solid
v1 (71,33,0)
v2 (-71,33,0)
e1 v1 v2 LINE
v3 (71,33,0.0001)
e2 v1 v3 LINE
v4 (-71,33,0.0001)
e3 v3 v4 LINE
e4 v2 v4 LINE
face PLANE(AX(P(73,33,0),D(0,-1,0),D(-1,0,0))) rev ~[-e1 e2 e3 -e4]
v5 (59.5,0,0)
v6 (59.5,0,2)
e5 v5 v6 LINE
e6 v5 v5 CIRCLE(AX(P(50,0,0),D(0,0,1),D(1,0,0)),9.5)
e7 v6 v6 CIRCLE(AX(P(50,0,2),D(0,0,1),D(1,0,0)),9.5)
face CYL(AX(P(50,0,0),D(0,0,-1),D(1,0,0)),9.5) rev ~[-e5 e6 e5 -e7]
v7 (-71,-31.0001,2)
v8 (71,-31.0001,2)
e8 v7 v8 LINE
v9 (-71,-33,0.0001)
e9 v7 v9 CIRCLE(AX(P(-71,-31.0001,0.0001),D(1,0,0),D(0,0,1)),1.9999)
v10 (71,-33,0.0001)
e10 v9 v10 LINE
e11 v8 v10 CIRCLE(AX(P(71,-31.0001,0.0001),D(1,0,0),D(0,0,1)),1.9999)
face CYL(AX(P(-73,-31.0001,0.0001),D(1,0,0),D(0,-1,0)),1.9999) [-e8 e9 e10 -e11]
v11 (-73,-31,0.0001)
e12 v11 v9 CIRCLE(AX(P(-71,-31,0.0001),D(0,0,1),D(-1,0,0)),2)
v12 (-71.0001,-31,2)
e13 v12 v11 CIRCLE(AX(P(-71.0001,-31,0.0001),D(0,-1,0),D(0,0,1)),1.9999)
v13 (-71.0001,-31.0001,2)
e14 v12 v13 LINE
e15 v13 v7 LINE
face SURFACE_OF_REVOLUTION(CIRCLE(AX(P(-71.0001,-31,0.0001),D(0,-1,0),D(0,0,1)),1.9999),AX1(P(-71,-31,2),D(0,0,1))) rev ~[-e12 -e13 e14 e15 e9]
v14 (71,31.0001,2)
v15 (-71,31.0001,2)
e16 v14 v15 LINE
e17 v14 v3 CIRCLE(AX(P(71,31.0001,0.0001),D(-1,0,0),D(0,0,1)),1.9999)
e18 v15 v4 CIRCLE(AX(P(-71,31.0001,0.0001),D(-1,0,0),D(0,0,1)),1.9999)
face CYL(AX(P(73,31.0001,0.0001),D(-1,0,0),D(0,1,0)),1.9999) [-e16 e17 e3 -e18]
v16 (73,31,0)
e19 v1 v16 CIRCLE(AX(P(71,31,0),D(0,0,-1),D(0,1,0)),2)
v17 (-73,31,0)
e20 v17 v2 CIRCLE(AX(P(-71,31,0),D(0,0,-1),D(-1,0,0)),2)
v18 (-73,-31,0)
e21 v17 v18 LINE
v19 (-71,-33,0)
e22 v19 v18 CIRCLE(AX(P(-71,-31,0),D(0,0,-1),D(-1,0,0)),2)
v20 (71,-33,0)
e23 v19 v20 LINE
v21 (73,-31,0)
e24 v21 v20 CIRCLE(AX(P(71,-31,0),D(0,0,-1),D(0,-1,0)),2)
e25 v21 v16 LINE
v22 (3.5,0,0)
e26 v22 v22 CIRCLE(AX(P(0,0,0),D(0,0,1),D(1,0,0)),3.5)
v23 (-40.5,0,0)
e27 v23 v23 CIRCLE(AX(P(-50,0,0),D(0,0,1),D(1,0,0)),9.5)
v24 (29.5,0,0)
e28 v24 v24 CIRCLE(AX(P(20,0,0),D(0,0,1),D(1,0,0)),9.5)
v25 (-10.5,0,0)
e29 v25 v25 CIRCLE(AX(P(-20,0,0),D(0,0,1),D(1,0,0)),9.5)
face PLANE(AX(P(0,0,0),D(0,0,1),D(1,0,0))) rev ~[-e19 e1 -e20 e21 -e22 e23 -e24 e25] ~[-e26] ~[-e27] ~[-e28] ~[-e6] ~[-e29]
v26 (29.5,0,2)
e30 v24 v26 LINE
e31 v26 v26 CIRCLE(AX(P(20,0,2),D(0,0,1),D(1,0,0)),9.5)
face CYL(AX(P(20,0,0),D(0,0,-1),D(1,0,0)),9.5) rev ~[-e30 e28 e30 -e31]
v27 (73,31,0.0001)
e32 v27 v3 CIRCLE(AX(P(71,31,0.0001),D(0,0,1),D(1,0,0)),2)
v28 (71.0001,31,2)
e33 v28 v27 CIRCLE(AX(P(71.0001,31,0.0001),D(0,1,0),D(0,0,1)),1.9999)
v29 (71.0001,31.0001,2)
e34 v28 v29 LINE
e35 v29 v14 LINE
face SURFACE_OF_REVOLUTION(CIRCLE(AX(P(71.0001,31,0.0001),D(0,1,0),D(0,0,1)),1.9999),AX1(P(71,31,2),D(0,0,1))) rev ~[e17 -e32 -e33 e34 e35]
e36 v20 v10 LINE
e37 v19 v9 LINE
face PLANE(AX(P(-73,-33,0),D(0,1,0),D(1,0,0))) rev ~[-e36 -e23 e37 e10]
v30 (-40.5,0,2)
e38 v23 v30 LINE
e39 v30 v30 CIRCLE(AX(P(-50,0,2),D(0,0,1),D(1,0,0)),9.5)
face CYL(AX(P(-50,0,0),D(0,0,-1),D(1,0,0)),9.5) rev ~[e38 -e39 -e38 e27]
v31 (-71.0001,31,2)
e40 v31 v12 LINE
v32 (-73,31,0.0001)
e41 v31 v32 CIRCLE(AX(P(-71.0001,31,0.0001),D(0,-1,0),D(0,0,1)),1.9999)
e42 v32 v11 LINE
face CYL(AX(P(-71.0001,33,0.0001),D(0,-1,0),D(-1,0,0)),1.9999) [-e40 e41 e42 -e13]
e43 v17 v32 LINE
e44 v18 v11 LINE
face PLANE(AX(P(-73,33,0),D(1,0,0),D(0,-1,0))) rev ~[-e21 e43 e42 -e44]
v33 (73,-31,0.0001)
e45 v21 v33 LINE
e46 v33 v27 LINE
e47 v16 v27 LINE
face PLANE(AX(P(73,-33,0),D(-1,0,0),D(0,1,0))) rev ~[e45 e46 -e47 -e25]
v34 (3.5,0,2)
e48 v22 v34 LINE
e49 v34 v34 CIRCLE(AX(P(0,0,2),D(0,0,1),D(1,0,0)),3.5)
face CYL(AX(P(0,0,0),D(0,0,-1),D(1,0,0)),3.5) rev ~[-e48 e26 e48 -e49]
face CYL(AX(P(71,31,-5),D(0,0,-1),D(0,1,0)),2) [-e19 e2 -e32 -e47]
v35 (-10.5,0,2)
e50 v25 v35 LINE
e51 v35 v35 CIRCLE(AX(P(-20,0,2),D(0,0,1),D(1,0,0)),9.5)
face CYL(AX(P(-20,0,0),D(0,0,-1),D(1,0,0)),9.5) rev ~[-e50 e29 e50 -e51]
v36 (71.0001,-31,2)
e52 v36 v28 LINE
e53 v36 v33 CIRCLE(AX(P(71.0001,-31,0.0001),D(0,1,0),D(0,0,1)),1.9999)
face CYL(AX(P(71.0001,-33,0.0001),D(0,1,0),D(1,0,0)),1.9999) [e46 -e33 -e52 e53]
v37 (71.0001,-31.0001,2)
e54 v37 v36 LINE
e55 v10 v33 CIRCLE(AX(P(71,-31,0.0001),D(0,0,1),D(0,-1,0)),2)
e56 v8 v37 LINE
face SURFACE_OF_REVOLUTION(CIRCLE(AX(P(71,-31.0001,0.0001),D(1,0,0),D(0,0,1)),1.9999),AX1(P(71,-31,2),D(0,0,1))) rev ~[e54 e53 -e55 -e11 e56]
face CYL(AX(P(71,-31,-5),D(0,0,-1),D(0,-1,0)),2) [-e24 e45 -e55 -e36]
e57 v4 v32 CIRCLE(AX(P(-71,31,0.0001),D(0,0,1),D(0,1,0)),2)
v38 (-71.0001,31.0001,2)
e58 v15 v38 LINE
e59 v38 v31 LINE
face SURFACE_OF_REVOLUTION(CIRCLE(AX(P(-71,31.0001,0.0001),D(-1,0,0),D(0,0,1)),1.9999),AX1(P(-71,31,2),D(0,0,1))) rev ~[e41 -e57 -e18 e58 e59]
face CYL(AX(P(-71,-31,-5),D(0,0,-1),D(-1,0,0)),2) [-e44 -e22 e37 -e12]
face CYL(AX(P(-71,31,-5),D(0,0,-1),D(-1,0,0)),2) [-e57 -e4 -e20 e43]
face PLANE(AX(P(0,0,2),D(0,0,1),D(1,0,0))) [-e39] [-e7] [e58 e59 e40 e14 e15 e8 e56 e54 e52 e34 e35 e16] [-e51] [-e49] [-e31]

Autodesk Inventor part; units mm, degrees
ref_plane "YZ Plane" through (0, 0, 0) normal (1, 0, 0) x (0, 1, 0)
ref_plane "XZ Plane" through (0, 0, 0) normal (0, 1, 0) x (-1, 0, 0)
ref_plane "XY Plane" through (0, 0, 0) normal (0, 0, 1) x (1, 0, 0)
sketch "Sketch1" plane through (0, 0, 0) normal (0, 0, 1) x (1, 0, 0)
  line L0 (-73, -33) -> (73, -33)
  line L1 (73, -33) -> (73, 33)
  line L2 (73, 33) -> (-73, 33)
  line L3 (-73, 33) -> (-73, -33)
  line L4 (-73, -33) -> (73, 33) construction
  line L5 (73, -33) -> (-73, 33) construction
  circle A0 centre (-20, 0) radius 9.5
  circle A1 centre (-50, 0) radius 9.5
  circle A2 centre (20, 0) radius 9.5
  circle A3 centre (50, 0) radius 9.5
  circle A4 centre (0, 0) radius 3.5
  dimension "d0" = 146
  dimension "d1" = 66
  dimension "d2" = 19
  dimension "d3" = 30
  dimension "d4" = 30
  dimension "d5" = 40
  dimension "d6" = 20
  dimension "d7" = 0
  dimension "d8" = 0
  dimension "d9" = 0
  dimension "d10" = 0
  dimension "d11" = 7
extrude "Extrusion1" add sketch "Sketch1" along normal blind 2
fillet "Fillet1" radius 2 4 edges at (0, -33, 2) (73, 0, 2) (0, 33, 2) (-73, 0, 2)
fillet "Fillet2" radius 2 4 edges at (-72.4142, -32.4142, 1.4142) (-72.4142, 32.4142, 1.4142) (72.4142, 32.4142, 1.4142) (72.4142, -32.4142, 1.4142)
equation "\"d4\" = d3"
properties part number "Cover"
